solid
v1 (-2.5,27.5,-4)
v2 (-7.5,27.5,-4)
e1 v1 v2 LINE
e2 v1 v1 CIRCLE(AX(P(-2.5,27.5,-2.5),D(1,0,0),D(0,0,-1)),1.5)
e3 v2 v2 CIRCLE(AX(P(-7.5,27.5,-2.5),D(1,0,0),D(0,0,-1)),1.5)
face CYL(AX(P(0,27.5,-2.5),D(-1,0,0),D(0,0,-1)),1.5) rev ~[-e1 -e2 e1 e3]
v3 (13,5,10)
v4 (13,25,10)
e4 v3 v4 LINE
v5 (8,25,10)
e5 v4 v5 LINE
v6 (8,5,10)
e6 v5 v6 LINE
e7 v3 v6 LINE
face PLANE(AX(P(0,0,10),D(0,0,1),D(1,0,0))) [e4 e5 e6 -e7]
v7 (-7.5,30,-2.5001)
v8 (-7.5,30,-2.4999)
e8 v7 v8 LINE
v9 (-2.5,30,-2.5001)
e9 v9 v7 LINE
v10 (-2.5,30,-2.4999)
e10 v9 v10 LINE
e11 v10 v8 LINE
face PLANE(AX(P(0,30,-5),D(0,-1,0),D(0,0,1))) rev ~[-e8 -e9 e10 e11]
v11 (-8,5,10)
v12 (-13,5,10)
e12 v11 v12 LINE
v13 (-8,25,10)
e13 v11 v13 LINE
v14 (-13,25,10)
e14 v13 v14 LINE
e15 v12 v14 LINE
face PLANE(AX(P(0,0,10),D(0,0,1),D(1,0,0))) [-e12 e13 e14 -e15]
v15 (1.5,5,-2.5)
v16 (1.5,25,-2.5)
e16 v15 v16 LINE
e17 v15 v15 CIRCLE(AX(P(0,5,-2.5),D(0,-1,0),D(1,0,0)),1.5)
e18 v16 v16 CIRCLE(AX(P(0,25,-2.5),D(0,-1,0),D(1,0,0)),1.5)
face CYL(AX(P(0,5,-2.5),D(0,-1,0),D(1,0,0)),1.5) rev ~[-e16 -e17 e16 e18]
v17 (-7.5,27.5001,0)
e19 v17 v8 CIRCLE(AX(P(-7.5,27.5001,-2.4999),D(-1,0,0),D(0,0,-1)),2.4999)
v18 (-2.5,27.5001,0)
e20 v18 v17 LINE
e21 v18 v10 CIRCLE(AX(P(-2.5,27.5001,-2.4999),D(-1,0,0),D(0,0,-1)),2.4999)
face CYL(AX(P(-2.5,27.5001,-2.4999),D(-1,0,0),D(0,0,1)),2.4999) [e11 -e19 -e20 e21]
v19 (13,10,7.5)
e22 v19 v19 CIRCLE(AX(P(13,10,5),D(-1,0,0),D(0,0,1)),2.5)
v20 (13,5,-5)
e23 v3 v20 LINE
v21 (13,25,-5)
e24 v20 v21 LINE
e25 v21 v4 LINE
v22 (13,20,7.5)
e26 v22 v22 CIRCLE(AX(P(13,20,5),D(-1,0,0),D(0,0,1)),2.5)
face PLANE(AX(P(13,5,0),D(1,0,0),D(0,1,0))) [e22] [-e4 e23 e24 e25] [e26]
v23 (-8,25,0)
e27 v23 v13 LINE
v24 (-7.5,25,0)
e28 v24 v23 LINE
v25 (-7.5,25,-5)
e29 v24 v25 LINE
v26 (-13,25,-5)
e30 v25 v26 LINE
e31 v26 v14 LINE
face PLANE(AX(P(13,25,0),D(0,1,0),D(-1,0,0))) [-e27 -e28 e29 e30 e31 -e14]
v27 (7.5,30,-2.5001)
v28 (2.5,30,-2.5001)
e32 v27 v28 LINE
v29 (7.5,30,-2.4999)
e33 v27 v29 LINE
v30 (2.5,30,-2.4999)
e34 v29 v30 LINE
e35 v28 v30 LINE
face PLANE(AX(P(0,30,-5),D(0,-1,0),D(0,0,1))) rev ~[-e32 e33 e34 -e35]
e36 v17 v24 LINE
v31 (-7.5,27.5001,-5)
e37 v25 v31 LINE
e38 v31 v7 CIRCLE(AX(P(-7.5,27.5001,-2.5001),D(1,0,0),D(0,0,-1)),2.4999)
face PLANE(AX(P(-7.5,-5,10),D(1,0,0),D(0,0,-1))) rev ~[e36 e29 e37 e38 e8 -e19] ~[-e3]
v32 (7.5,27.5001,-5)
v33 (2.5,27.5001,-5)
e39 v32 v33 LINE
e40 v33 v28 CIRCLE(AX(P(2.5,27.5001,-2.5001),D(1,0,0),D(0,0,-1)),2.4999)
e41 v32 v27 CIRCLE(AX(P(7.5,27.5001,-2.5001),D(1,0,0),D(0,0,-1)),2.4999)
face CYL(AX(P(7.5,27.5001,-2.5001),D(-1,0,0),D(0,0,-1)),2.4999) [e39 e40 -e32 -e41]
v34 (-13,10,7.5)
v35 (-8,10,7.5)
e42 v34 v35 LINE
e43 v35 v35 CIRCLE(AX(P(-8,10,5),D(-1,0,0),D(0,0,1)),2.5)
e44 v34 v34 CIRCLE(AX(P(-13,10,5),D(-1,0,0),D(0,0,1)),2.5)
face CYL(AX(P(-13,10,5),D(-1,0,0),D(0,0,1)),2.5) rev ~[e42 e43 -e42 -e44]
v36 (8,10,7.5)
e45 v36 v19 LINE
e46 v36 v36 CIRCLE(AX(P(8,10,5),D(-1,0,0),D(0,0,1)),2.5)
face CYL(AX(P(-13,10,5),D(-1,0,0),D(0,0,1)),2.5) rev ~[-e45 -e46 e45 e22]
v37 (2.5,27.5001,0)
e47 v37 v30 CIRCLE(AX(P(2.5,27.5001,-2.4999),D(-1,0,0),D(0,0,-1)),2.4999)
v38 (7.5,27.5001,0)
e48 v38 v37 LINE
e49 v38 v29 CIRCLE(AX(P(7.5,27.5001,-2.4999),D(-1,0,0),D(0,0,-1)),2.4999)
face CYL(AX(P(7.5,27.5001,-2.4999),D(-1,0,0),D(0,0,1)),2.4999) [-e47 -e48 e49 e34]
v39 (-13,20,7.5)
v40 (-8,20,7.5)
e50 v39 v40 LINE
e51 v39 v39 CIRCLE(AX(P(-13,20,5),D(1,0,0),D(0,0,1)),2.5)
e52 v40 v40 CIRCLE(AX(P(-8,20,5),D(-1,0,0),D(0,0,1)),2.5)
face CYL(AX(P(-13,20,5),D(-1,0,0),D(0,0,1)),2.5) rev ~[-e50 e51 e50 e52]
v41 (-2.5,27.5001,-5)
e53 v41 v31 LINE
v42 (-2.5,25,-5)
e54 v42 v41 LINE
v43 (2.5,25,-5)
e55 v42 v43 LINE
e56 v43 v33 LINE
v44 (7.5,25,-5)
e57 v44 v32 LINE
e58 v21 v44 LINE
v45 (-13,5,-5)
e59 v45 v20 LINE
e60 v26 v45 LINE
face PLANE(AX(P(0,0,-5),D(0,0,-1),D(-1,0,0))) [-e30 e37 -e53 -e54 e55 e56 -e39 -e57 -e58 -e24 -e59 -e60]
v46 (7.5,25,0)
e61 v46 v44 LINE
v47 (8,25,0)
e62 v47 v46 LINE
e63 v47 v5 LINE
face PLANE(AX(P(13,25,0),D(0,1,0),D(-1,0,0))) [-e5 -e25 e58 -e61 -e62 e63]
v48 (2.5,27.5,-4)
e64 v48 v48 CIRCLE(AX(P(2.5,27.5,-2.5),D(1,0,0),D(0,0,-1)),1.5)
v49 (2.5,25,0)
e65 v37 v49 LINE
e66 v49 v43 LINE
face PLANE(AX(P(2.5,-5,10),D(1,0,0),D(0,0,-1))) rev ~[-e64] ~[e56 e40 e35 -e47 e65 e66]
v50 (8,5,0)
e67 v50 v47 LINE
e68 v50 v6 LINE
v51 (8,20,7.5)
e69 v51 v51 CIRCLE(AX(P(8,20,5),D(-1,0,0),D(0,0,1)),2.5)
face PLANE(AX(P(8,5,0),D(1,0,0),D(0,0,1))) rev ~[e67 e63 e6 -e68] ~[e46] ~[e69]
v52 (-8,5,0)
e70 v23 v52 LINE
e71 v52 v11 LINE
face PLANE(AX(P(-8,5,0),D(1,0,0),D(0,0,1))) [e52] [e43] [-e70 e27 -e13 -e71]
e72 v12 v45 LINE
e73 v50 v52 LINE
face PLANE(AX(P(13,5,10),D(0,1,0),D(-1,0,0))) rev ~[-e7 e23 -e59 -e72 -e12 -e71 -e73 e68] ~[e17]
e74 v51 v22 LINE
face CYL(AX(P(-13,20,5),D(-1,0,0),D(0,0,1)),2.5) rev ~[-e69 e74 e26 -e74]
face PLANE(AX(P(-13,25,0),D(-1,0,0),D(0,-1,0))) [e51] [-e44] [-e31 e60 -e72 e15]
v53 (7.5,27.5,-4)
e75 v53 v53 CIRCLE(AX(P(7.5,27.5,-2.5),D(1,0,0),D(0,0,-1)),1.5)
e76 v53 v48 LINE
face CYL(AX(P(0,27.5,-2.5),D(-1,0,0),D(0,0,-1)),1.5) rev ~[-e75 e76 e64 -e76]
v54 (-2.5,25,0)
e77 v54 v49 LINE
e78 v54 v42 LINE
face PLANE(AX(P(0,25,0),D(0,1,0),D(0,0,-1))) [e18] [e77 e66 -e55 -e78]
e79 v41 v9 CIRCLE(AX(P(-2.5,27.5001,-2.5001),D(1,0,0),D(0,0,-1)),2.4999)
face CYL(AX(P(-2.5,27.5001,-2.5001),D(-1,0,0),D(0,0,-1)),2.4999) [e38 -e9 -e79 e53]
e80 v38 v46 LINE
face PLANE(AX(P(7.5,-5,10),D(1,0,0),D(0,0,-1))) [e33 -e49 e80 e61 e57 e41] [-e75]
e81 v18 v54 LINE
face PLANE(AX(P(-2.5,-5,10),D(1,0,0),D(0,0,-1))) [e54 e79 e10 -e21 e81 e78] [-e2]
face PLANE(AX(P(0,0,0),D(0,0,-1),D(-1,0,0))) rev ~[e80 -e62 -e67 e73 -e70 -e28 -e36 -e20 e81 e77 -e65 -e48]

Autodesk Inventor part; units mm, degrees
ref_plane "YZ Plane" through (0, 0, 0) normal (1, 0, 0) x (0, 1, 0)
sketch "스케치1" plane through (0, 0, 0) normal (0, 0, 1) x (1, 0, 0)
  line L0 (-13, -5) -> (13, -5)
  line L1 (13, -5) -> (13, 5)
  line L2 (13, 5) -> (-13, 5)
  line L3 (-13, 5) -> (-13, -5)
  line L4 (-13, -5) -> (13, 5) construction
  line L5 (13, -5) -> (-13, 5) construction
  circle A0 centre (0, 0) radius 2.5
  dimension "d0" = 26
  dimension "d1" = 10
  dimension "d2" = 5
extrude "돌출1" add sketch "스케치1" along normal blind 10
sketch "스케치2" plane through (-13, 5, 0) normal (0, 1, 0) x (1, 0, 0)
  line L0 (26, 0) -> (0, 0) projected
  line L1 (26, -10) -> (0, -10) projected
  line L2 (0, 0) -> (5, 0)
  line L3 (5, 0) -> (5, -10)
  line L4 (5, -10) -> (0, -10)
  line L5 (0, -10) -> (0, 0)
  line L6 (13, 0) -> (13, -10)
  line L7 (26, 0) -> (21, 0)
  line L8 (21, 0) -> (21, -10)
  line L9 (21, -10) -> (26, -10)
  line L10 (26, -10) -> (26, 0)
  point P0 (0, -10)
  point P1 (21, 0)
  dimension "d5" = 5
  dimension "d6" = 8
extrude "돌출2" add sketch "스케치2" along normal blind 10 contours L10 L1 L8 L0 | L3 L1 L5 L0
sketch "스케치3" plane through (-13, 5, 0) normal (-1, 0, 0) x (0, 0, 1)
  circle A0 centre (5, 5) radius 2.5
  line L0 (0, 10) -> (10, 10) projected
  line L1 (10, -10) -> (10, 10) projected
  point P0 (0, -5)
  point P1 (10, 0)
  point P2 (10, 5)
  point P3 (5, 10)
  point P4 (5, 10)
  dimension "d9" = 5
extrude "돌출3" cut sketch "스케치3" against normal through all
ref_plane "작업 평면1" through (-13, 15, 0) normal (0, 1, 0) x (1, 0, 0)
mirror "미러1" about plane through (-10.5, 15, 5) normal (0, 1, 0) of "돌출3", "돌출2"
sketch "스케치4" plane through (0, 0, 0) normal (0, 0, -1) x (-1, 0, 0)
  line L0 (-13, 5) -> (-13, 25) projected
  line L1 (13, -5) -> (-13, -5) projected
  line L2 (-13, 25) -> (13, 25)
  line L3 (13, 25) -> (13, -5)
  line L4 (13, -5) -> (-13, -5)
  line L5 (-13, -5) -> (-13, 25)
  point P0 (0, 0)
  point P1 (13, 25)
extrude "돌출4" add sketch "스케치4" along normal blind 5
ref_plane "작업 평면2" through (0, -5, 10) normal (1, 0, 0) x (0, 0, -1)
sketch "스케치5" plane through (0, -5, 10) normal (1, 0, 0) x (0, 0, -1)
  line L0 (10, 10) -> (10, 30) projected
  line L1 (10, 30) -> (15, 30)
  line L2 (15, 30) -> (15, 35)
  line L3 (15, 35) -> (10, 35)
  line L4 (10, 35) -> (10, 30)
  circle A0 centre (12.5, 32.5) radius 1.5
  point P0 (10, 5)
  point P1 (10, 32.5)
  point P2 (12.5, 35)
  dimension "d16" = 5
  dimension "d19" = 3
extrude "돌출5" add sketch "스케치5" along normal mid plane 15
extrude "돌출6" cut sketch "스케치5" along normal mid plane 5
fillet "모깎기2" radius 2.5 4 edges at (-5, 30, -5) (-5, 30, 0) (5, 30, -5) (5, 30, 0)
sketch "스케치6" plane through (0, 0, 10) normal (0, 0, 1) x (1, 0, 0)
  line L0 (-13, -5) -> (13, -5) projected
  line L1 (13, 25) -> (13, -5) projected
  line L2 (-13, -5) -> (13, -5)
  line L3 (13, -5) -> (13, 5)
  line L4 (13, 5) -> (-13, 5)
  line L5 (-13, 5) -> (-13, -5)
  point P0 (0, 0)
  point P1 (8, 5)
extrude "돌출7" cut sketch "스케치6" against normal through all
sketch "스케치7" plane through (-8, 5, 0) normal (0, -1, 0) x (1, 0, 0)
  circle A0 centre (8, -2.5) radius 1.5
  line L0 (16, 0) -> (0, 0) projected
  line L1 (21, -5) -> (-5, -5) projected
  point P0 (8, 0)
  point P1 (8, 0)
  dimension "d25" = 3
  dimension "d26" = 5
  dimension "d27" = 2.5
extrude "돌출8" cut sketch "스케치7" against normal through all
equation "\"d27\" = 0.5 * d26"
properties part number "SteeringFrameFront"
